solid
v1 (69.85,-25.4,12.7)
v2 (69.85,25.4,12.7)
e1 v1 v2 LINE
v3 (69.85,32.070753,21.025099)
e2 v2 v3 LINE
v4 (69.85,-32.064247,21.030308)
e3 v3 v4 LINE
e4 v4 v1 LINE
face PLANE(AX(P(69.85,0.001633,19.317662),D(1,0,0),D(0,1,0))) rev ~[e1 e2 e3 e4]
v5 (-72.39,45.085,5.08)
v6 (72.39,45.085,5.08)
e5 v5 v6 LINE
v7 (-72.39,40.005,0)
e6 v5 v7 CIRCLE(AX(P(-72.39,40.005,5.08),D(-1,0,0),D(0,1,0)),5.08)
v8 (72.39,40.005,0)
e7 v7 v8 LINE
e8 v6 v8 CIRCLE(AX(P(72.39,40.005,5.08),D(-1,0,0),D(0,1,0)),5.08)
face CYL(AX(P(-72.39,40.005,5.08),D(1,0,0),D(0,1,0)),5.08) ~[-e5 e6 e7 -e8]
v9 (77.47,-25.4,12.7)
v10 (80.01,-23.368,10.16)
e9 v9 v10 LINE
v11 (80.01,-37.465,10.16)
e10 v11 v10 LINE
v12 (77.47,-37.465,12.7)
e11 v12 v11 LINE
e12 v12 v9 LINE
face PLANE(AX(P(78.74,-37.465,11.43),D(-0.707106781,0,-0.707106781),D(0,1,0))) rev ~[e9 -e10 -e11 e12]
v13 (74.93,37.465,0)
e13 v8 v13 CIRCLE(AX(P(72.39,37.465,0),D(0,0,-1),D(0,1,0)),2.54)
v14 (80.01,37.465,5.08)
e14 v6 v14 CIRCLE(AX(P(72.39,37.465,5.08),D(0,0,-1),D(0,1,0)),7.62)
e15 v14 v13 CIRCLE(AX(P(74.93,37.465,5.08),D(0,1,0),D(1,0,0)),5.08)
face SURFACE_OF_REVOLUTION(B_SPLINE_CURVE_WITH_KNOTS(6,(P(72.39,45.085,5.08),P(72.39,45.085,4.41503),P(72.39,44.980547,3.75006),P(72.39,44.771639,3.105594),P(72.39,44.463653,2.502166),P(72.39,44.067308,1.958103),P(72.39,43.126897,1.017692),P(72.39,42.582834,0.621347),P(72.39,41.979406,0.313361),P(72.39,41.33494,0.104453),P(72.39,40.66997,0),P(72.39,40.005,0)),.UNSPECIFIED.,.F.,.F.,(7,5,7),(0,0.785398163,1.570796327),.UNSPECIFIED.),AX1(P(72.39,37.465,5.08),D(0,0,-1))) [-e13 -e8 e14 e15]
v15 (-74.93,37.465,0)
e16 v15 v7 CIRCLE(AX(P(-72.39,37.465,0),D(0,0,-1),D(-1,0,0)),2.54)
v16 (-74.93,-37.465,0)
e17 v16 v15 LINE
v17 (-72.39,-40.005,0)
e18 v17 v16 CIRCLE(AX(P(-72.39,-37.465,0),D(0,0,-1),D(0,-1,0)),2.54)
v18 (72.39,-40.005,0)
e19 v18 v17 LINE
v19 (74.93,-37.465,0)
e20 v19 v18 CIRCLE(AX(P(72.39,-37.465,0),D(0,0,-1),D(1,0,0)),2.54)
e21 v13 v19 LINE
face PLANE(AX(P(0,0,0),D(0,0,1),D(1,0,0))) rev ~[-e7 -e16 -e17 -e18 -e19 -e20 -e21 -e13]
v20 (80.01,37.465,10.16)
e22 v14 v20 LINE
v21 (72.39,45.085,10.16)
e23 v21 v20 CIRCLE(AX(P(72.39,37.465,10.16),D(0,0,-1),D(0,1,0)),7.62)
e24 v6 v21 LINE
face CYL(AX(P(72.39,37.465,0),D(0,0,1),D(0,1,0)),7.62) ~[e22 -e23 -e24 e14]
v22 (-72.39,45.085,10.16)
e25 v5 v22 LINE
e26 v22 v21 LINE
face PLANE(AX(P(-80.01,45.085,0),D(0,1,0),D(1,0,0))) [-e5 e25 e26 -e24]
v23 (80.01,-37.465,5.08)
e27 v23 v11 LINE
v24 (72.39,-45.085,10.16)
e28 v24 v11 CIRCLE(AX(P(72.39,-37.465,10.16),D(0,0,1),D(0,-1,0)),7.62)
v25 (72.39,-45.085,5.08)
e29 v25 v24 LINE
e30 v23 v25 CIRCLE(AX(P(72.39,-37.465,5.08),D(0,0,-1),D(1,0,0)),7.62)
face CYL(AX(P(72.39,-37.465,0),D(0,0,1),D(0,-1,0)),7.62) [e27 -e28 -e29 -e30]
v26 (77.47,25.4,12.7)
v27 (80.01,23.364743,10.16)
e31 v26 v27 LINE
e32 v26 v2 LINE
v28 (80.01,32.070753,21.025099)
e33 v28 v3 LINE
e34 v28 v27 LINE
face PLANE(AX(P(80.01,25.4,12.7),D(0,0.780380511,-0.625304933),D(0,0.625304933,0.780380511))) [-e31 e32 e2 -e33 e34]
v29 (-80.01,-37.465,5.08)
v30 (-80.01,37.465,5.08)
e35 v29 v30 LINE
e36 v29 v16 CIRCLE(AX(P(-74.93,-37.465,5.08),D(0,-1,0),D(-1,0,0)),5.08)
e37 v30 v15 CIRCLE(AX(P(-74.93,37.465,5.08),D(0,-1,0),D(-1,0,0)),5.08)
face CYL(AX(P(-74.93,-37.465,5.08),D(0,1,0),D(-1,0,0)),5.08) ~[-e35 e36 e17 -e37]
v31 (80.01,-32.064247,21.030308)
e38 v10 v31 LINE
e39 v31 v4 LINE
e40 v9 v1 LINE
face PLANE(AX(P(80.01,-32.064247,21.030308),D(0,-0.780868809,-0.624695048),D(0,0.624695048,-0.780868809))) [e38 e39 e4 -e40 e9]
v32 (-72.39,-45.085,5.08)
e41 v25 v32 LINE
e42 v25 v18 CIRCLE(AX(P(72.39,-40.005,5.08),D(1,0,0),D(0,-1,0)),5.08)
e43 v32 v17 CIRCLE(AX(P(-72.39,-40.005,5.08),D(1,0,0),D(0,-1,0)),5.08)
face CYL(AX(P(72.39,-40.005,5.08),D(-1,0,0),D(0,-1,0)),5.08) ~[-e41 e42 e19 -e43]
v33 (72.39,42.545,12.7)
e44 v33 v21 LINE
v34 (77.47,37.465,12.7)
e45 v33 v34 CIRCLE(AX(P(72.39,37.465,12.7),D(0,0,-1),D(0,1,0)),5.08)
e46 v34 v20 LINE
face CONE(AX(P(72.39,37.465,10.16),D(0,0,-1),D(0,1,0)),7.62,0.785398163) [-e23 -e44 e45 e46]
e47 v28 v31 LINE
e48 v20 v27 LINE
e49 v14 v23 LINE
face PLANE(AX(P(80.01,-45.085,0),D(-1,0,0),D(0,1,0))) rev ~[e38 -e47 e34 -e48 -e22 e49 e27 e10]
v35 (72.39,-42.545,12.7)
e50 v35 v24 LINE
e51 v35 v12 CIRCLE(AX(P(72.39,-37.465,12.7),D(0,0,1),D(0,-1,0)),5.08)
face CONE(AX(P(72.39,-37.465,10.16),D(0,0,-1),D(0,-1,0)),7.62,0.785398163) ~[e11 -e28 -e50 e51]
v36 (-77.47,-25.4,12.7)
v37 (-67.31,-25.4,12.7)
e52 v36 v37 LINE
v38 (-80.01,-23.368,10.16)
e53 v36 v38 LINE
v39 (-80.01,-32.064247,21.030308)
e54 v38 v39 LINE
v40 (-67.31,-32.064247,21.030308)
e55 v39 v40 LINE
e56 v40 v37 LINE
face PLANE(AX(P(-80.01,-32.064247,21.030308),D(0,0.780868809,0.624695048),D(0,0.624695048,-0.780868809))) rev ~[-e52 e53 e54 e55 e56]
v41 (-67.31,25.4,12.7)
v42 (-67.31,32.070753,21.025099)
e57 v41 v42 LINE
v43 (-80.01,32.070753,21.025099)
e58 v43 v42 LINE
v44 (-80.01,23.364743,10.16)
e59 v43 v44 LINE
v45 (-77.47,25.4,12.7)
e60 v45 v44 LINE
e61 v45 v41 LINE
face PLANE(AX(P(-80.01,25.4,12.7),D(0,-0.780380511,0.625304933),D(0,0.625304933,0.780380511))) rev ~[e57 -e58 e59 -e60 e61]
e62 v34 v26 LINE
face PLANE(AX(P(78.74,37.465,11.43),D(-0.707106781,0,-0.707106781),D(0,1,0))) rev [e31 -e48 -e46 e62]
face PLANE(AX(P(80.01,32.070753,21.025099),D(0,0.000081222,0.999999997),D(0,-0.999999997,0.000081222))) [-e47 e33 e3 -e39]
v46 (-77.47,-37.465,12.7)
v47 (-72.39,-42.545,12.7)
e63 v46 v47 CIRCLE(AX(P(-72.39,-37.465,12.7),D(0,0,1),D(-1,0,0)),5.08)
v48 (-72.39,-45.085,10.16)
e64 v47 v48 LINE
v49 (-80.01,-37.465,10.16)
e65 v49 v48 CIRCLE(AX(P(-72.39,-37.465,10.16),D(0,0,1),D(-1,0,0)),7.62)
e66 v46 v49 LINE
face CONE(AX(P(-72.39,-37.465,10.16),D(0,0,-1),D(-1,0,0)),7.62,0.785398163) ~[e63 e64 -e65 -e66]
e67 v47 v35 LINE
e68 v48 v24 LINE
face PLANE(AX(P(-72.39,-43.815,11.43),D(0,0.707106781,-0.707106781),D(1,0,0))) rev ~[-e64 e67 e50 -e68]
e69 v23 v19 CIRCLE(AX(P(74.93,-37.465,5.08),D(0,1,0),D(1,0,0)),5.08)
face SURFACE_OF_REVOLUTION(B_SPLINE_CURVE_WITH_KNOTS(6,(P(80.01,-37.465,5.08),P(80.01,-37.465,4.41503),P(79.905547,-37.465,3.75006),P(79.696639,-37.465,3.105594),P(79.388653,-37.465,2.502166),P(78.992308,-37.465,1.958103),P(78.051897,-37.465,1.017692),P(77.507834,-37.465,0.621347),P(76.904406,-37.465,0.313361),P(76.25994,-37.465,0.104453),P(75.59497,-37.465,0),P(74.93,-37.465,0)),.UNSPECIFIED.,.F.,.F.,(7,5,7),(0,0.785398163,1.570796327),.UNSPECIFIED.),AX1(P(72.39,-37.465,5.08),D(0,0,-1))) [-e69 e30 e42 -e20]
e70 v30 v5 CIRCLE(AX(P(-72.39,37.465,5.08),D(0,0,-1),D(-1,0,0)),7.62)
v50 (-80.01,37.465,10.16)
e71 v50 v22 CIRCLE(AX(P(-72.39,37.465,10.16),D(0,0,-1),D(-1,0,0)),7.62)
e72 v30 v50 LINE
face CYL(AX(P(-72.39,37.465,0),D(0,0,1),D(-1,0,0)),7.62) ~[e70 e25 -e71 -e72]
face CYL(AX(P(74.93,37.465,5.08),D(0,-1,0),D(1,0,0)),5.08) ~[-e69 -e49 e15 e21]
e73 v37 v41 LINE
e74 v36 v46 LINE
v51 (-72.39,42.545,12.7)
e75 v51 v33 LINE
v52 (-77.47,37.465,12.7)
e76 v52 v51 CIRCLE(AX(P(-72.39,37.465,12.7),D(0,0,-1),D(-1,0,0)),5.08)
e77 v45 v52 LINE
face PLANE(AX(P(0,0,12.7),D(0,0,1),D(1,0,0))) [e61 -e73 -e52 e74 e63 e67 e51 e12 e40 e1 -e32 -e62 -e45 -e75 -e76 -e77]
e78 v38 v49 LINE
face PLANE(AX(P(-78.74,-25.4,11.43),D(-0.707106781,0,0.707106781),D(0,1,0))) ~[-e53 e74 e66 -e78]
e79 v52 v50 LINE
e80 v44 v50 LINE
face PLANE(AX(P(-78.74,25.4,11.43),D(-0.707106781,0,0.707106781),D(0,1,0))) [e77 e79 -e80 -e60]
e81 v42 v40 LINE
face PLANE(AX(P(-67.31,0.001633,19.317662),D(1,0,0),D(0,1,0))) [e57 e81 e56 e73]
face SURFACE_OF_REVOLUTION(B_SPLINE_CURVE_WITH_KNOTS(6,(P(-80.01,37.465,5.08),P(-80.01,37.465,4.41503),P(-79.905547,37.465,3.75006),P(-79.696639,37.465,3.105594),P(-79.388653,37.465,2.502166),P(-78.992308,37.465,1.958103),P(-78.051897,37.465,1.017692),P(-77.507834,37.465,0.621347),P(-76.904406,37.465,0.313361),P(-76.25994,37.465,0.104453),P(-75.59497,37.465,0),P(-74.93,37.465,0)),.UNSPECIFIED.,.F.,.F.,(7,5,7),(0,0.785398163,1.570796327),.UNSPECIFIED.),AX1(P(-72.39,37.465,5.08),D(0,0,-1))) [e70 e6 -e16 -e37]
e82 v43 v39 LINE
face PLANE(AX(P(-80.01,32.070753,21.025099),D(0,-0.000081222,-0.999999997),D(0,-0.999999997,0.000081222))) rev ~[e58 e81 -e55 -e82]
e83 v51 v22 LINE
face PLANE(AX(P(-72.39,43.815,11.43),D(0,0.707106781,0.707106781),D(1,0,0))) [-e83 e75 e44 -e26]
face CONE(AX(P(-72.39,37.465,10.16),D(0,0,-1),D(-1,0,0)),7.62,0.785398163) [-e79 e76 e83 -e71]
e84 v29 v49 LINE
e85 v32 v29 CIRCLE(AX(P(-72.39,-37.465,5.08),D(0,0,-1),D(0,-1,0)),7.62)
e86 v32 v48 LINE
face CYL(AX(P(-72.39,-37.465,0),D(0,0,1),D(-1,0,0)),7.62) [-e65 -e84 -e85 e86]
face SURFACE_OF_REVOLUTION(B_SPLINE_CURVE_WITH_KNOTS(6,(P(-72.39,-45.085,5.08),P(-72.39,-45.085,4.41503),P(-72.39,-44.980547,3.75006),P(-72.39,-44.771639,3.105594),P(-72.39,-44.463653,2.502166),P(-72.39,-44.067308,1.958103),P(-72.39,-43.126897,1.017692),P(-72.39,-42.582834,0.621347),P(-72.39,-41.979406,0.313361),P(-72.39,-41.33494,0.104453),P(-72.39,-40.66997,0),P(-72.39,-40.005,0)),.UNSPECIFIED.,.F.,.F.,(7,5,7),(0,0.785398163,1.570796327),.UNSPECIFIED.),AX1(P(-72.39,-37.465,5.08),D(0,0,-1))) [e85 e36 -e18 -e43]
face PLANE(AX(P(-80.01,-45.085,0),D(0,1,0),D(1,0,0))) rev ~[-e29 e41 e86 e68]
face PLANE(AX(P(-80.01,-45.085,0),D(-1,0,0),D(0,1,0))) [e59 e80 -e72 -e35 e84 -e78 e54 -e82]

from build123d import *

# Parameters (mm, degrees)
F0_W      = 149.86
F0_H      = 80.01
F1_DEPTH  = 12.7
F0_W_2    = 160.02
F0_H_2    = 90.17
F2_DEPTH  = 12.7
F3_R      = 7.62
F4_R      = 5.08
F7_W      = 50.8
F7_H      = 6.35
F8_DEPTH  = 12.7
F9_W      = 50.8
F9_H      = 6.35
F10_DEPTH = 10.16
F11_SIZE  = 2.54


# Not quite as in the source:
# - a feature names something its author has since deleted; it is built from what else it names


with BuildPart() as f1:
    # F0 (on Top) → F1 (new body)
    with BuildSketch(Plane.XY):
        Rectangle(F0_W, F0_H)
    extrude(amount=F1_DEPTH)

    # F0 (on Top) → F2 (join)
    with BuildSketch(Plane.XY):
        Rectangle(F0_W_2, F0_H_2)
        Rectangle(F0_W, F0_H, mode=Mode.SUBTRACT)
    extrude(amount=F2_DEPTH)

    # F3
    f3_edges = [f1.edges().sort_by_distance(p)[0] for p in [
        (-80.01, 45.085, 6.35),
        (-80.01, -45.085, 6.35),
        (80.01, -45.085, 6.35),
        (80.01, 45.085, 6.35),
    ]]
    fillet(f3_edges, radius=F3_R)

    # F4
    f4_edges = [f1.edges().sort_by_distance(p)[0] for p in [
        (-80.01, 0, 0),
        (0, 45.085, 0),
        (80.01, 0, 0),
        (77.778154, 42.853154, 0),
        (77.778154, -42.853154, 0),
        (-77.778154, -42.853154, 0),
        (0, -45.085, 0),
        (-77.778154, 42.853154, 0),
    ]]
    fillet(f4_edges, radius=F4_R)

    # F7 (on face) → F8 (join)
    with BuildSketch(Plane.YZ.offset(-80.01)):
        Polygon((32.0707530211, 21.0250992866), (-32.0642467673, 21.0303084591), (-25.4, 12.7), (-25.4, 19.05), (25.4, 19.05), (25.4, 12.7), align=None)
        with Locations((0, 15.875)):
            Rectangle(F7_W, F7_H)
    extrude(amount=F8_DEPTH)

    # F9 (on face) → F10 (join)
    with BuildSketch(Plane.YZ.offset(80.01)):
        Polygon((32.0707530211, 21.0250992866), (-32.0642467673, 21.0303084591), (-25.4, 12.7), (-25.4, 19.05), (25.4, 19.05), (25.4, 12.7), align=None)
        with Locations((0, 15.875)):
            Rectangle(F9_W, F9_H)
    extrude(amount=-F10_DEPTH)

    # F11
    f11_edges = [f1.edges().sort_by_distance(p)[0] for p in [
        (0, 45.085, 12.7),
        (0, -45.085, 12.7),
        (-80.01, 31.4325, 12.7),
        (-80.01, -31.4325, 12.7),
        (-77.778154, 42.853154, 12.7),
        (-77.778154, -42.853154, 12.7),
        (77.778154, 42.853154, 12.7),
        (77.778154, -42.853154, 12.7),
        (80.01, -31.4325, 12.7),
        (80.01, 31.4325, 12.7),
    ]]
    chamfer(f11_edges, length=F11_SIZE)


solid = f1.part
